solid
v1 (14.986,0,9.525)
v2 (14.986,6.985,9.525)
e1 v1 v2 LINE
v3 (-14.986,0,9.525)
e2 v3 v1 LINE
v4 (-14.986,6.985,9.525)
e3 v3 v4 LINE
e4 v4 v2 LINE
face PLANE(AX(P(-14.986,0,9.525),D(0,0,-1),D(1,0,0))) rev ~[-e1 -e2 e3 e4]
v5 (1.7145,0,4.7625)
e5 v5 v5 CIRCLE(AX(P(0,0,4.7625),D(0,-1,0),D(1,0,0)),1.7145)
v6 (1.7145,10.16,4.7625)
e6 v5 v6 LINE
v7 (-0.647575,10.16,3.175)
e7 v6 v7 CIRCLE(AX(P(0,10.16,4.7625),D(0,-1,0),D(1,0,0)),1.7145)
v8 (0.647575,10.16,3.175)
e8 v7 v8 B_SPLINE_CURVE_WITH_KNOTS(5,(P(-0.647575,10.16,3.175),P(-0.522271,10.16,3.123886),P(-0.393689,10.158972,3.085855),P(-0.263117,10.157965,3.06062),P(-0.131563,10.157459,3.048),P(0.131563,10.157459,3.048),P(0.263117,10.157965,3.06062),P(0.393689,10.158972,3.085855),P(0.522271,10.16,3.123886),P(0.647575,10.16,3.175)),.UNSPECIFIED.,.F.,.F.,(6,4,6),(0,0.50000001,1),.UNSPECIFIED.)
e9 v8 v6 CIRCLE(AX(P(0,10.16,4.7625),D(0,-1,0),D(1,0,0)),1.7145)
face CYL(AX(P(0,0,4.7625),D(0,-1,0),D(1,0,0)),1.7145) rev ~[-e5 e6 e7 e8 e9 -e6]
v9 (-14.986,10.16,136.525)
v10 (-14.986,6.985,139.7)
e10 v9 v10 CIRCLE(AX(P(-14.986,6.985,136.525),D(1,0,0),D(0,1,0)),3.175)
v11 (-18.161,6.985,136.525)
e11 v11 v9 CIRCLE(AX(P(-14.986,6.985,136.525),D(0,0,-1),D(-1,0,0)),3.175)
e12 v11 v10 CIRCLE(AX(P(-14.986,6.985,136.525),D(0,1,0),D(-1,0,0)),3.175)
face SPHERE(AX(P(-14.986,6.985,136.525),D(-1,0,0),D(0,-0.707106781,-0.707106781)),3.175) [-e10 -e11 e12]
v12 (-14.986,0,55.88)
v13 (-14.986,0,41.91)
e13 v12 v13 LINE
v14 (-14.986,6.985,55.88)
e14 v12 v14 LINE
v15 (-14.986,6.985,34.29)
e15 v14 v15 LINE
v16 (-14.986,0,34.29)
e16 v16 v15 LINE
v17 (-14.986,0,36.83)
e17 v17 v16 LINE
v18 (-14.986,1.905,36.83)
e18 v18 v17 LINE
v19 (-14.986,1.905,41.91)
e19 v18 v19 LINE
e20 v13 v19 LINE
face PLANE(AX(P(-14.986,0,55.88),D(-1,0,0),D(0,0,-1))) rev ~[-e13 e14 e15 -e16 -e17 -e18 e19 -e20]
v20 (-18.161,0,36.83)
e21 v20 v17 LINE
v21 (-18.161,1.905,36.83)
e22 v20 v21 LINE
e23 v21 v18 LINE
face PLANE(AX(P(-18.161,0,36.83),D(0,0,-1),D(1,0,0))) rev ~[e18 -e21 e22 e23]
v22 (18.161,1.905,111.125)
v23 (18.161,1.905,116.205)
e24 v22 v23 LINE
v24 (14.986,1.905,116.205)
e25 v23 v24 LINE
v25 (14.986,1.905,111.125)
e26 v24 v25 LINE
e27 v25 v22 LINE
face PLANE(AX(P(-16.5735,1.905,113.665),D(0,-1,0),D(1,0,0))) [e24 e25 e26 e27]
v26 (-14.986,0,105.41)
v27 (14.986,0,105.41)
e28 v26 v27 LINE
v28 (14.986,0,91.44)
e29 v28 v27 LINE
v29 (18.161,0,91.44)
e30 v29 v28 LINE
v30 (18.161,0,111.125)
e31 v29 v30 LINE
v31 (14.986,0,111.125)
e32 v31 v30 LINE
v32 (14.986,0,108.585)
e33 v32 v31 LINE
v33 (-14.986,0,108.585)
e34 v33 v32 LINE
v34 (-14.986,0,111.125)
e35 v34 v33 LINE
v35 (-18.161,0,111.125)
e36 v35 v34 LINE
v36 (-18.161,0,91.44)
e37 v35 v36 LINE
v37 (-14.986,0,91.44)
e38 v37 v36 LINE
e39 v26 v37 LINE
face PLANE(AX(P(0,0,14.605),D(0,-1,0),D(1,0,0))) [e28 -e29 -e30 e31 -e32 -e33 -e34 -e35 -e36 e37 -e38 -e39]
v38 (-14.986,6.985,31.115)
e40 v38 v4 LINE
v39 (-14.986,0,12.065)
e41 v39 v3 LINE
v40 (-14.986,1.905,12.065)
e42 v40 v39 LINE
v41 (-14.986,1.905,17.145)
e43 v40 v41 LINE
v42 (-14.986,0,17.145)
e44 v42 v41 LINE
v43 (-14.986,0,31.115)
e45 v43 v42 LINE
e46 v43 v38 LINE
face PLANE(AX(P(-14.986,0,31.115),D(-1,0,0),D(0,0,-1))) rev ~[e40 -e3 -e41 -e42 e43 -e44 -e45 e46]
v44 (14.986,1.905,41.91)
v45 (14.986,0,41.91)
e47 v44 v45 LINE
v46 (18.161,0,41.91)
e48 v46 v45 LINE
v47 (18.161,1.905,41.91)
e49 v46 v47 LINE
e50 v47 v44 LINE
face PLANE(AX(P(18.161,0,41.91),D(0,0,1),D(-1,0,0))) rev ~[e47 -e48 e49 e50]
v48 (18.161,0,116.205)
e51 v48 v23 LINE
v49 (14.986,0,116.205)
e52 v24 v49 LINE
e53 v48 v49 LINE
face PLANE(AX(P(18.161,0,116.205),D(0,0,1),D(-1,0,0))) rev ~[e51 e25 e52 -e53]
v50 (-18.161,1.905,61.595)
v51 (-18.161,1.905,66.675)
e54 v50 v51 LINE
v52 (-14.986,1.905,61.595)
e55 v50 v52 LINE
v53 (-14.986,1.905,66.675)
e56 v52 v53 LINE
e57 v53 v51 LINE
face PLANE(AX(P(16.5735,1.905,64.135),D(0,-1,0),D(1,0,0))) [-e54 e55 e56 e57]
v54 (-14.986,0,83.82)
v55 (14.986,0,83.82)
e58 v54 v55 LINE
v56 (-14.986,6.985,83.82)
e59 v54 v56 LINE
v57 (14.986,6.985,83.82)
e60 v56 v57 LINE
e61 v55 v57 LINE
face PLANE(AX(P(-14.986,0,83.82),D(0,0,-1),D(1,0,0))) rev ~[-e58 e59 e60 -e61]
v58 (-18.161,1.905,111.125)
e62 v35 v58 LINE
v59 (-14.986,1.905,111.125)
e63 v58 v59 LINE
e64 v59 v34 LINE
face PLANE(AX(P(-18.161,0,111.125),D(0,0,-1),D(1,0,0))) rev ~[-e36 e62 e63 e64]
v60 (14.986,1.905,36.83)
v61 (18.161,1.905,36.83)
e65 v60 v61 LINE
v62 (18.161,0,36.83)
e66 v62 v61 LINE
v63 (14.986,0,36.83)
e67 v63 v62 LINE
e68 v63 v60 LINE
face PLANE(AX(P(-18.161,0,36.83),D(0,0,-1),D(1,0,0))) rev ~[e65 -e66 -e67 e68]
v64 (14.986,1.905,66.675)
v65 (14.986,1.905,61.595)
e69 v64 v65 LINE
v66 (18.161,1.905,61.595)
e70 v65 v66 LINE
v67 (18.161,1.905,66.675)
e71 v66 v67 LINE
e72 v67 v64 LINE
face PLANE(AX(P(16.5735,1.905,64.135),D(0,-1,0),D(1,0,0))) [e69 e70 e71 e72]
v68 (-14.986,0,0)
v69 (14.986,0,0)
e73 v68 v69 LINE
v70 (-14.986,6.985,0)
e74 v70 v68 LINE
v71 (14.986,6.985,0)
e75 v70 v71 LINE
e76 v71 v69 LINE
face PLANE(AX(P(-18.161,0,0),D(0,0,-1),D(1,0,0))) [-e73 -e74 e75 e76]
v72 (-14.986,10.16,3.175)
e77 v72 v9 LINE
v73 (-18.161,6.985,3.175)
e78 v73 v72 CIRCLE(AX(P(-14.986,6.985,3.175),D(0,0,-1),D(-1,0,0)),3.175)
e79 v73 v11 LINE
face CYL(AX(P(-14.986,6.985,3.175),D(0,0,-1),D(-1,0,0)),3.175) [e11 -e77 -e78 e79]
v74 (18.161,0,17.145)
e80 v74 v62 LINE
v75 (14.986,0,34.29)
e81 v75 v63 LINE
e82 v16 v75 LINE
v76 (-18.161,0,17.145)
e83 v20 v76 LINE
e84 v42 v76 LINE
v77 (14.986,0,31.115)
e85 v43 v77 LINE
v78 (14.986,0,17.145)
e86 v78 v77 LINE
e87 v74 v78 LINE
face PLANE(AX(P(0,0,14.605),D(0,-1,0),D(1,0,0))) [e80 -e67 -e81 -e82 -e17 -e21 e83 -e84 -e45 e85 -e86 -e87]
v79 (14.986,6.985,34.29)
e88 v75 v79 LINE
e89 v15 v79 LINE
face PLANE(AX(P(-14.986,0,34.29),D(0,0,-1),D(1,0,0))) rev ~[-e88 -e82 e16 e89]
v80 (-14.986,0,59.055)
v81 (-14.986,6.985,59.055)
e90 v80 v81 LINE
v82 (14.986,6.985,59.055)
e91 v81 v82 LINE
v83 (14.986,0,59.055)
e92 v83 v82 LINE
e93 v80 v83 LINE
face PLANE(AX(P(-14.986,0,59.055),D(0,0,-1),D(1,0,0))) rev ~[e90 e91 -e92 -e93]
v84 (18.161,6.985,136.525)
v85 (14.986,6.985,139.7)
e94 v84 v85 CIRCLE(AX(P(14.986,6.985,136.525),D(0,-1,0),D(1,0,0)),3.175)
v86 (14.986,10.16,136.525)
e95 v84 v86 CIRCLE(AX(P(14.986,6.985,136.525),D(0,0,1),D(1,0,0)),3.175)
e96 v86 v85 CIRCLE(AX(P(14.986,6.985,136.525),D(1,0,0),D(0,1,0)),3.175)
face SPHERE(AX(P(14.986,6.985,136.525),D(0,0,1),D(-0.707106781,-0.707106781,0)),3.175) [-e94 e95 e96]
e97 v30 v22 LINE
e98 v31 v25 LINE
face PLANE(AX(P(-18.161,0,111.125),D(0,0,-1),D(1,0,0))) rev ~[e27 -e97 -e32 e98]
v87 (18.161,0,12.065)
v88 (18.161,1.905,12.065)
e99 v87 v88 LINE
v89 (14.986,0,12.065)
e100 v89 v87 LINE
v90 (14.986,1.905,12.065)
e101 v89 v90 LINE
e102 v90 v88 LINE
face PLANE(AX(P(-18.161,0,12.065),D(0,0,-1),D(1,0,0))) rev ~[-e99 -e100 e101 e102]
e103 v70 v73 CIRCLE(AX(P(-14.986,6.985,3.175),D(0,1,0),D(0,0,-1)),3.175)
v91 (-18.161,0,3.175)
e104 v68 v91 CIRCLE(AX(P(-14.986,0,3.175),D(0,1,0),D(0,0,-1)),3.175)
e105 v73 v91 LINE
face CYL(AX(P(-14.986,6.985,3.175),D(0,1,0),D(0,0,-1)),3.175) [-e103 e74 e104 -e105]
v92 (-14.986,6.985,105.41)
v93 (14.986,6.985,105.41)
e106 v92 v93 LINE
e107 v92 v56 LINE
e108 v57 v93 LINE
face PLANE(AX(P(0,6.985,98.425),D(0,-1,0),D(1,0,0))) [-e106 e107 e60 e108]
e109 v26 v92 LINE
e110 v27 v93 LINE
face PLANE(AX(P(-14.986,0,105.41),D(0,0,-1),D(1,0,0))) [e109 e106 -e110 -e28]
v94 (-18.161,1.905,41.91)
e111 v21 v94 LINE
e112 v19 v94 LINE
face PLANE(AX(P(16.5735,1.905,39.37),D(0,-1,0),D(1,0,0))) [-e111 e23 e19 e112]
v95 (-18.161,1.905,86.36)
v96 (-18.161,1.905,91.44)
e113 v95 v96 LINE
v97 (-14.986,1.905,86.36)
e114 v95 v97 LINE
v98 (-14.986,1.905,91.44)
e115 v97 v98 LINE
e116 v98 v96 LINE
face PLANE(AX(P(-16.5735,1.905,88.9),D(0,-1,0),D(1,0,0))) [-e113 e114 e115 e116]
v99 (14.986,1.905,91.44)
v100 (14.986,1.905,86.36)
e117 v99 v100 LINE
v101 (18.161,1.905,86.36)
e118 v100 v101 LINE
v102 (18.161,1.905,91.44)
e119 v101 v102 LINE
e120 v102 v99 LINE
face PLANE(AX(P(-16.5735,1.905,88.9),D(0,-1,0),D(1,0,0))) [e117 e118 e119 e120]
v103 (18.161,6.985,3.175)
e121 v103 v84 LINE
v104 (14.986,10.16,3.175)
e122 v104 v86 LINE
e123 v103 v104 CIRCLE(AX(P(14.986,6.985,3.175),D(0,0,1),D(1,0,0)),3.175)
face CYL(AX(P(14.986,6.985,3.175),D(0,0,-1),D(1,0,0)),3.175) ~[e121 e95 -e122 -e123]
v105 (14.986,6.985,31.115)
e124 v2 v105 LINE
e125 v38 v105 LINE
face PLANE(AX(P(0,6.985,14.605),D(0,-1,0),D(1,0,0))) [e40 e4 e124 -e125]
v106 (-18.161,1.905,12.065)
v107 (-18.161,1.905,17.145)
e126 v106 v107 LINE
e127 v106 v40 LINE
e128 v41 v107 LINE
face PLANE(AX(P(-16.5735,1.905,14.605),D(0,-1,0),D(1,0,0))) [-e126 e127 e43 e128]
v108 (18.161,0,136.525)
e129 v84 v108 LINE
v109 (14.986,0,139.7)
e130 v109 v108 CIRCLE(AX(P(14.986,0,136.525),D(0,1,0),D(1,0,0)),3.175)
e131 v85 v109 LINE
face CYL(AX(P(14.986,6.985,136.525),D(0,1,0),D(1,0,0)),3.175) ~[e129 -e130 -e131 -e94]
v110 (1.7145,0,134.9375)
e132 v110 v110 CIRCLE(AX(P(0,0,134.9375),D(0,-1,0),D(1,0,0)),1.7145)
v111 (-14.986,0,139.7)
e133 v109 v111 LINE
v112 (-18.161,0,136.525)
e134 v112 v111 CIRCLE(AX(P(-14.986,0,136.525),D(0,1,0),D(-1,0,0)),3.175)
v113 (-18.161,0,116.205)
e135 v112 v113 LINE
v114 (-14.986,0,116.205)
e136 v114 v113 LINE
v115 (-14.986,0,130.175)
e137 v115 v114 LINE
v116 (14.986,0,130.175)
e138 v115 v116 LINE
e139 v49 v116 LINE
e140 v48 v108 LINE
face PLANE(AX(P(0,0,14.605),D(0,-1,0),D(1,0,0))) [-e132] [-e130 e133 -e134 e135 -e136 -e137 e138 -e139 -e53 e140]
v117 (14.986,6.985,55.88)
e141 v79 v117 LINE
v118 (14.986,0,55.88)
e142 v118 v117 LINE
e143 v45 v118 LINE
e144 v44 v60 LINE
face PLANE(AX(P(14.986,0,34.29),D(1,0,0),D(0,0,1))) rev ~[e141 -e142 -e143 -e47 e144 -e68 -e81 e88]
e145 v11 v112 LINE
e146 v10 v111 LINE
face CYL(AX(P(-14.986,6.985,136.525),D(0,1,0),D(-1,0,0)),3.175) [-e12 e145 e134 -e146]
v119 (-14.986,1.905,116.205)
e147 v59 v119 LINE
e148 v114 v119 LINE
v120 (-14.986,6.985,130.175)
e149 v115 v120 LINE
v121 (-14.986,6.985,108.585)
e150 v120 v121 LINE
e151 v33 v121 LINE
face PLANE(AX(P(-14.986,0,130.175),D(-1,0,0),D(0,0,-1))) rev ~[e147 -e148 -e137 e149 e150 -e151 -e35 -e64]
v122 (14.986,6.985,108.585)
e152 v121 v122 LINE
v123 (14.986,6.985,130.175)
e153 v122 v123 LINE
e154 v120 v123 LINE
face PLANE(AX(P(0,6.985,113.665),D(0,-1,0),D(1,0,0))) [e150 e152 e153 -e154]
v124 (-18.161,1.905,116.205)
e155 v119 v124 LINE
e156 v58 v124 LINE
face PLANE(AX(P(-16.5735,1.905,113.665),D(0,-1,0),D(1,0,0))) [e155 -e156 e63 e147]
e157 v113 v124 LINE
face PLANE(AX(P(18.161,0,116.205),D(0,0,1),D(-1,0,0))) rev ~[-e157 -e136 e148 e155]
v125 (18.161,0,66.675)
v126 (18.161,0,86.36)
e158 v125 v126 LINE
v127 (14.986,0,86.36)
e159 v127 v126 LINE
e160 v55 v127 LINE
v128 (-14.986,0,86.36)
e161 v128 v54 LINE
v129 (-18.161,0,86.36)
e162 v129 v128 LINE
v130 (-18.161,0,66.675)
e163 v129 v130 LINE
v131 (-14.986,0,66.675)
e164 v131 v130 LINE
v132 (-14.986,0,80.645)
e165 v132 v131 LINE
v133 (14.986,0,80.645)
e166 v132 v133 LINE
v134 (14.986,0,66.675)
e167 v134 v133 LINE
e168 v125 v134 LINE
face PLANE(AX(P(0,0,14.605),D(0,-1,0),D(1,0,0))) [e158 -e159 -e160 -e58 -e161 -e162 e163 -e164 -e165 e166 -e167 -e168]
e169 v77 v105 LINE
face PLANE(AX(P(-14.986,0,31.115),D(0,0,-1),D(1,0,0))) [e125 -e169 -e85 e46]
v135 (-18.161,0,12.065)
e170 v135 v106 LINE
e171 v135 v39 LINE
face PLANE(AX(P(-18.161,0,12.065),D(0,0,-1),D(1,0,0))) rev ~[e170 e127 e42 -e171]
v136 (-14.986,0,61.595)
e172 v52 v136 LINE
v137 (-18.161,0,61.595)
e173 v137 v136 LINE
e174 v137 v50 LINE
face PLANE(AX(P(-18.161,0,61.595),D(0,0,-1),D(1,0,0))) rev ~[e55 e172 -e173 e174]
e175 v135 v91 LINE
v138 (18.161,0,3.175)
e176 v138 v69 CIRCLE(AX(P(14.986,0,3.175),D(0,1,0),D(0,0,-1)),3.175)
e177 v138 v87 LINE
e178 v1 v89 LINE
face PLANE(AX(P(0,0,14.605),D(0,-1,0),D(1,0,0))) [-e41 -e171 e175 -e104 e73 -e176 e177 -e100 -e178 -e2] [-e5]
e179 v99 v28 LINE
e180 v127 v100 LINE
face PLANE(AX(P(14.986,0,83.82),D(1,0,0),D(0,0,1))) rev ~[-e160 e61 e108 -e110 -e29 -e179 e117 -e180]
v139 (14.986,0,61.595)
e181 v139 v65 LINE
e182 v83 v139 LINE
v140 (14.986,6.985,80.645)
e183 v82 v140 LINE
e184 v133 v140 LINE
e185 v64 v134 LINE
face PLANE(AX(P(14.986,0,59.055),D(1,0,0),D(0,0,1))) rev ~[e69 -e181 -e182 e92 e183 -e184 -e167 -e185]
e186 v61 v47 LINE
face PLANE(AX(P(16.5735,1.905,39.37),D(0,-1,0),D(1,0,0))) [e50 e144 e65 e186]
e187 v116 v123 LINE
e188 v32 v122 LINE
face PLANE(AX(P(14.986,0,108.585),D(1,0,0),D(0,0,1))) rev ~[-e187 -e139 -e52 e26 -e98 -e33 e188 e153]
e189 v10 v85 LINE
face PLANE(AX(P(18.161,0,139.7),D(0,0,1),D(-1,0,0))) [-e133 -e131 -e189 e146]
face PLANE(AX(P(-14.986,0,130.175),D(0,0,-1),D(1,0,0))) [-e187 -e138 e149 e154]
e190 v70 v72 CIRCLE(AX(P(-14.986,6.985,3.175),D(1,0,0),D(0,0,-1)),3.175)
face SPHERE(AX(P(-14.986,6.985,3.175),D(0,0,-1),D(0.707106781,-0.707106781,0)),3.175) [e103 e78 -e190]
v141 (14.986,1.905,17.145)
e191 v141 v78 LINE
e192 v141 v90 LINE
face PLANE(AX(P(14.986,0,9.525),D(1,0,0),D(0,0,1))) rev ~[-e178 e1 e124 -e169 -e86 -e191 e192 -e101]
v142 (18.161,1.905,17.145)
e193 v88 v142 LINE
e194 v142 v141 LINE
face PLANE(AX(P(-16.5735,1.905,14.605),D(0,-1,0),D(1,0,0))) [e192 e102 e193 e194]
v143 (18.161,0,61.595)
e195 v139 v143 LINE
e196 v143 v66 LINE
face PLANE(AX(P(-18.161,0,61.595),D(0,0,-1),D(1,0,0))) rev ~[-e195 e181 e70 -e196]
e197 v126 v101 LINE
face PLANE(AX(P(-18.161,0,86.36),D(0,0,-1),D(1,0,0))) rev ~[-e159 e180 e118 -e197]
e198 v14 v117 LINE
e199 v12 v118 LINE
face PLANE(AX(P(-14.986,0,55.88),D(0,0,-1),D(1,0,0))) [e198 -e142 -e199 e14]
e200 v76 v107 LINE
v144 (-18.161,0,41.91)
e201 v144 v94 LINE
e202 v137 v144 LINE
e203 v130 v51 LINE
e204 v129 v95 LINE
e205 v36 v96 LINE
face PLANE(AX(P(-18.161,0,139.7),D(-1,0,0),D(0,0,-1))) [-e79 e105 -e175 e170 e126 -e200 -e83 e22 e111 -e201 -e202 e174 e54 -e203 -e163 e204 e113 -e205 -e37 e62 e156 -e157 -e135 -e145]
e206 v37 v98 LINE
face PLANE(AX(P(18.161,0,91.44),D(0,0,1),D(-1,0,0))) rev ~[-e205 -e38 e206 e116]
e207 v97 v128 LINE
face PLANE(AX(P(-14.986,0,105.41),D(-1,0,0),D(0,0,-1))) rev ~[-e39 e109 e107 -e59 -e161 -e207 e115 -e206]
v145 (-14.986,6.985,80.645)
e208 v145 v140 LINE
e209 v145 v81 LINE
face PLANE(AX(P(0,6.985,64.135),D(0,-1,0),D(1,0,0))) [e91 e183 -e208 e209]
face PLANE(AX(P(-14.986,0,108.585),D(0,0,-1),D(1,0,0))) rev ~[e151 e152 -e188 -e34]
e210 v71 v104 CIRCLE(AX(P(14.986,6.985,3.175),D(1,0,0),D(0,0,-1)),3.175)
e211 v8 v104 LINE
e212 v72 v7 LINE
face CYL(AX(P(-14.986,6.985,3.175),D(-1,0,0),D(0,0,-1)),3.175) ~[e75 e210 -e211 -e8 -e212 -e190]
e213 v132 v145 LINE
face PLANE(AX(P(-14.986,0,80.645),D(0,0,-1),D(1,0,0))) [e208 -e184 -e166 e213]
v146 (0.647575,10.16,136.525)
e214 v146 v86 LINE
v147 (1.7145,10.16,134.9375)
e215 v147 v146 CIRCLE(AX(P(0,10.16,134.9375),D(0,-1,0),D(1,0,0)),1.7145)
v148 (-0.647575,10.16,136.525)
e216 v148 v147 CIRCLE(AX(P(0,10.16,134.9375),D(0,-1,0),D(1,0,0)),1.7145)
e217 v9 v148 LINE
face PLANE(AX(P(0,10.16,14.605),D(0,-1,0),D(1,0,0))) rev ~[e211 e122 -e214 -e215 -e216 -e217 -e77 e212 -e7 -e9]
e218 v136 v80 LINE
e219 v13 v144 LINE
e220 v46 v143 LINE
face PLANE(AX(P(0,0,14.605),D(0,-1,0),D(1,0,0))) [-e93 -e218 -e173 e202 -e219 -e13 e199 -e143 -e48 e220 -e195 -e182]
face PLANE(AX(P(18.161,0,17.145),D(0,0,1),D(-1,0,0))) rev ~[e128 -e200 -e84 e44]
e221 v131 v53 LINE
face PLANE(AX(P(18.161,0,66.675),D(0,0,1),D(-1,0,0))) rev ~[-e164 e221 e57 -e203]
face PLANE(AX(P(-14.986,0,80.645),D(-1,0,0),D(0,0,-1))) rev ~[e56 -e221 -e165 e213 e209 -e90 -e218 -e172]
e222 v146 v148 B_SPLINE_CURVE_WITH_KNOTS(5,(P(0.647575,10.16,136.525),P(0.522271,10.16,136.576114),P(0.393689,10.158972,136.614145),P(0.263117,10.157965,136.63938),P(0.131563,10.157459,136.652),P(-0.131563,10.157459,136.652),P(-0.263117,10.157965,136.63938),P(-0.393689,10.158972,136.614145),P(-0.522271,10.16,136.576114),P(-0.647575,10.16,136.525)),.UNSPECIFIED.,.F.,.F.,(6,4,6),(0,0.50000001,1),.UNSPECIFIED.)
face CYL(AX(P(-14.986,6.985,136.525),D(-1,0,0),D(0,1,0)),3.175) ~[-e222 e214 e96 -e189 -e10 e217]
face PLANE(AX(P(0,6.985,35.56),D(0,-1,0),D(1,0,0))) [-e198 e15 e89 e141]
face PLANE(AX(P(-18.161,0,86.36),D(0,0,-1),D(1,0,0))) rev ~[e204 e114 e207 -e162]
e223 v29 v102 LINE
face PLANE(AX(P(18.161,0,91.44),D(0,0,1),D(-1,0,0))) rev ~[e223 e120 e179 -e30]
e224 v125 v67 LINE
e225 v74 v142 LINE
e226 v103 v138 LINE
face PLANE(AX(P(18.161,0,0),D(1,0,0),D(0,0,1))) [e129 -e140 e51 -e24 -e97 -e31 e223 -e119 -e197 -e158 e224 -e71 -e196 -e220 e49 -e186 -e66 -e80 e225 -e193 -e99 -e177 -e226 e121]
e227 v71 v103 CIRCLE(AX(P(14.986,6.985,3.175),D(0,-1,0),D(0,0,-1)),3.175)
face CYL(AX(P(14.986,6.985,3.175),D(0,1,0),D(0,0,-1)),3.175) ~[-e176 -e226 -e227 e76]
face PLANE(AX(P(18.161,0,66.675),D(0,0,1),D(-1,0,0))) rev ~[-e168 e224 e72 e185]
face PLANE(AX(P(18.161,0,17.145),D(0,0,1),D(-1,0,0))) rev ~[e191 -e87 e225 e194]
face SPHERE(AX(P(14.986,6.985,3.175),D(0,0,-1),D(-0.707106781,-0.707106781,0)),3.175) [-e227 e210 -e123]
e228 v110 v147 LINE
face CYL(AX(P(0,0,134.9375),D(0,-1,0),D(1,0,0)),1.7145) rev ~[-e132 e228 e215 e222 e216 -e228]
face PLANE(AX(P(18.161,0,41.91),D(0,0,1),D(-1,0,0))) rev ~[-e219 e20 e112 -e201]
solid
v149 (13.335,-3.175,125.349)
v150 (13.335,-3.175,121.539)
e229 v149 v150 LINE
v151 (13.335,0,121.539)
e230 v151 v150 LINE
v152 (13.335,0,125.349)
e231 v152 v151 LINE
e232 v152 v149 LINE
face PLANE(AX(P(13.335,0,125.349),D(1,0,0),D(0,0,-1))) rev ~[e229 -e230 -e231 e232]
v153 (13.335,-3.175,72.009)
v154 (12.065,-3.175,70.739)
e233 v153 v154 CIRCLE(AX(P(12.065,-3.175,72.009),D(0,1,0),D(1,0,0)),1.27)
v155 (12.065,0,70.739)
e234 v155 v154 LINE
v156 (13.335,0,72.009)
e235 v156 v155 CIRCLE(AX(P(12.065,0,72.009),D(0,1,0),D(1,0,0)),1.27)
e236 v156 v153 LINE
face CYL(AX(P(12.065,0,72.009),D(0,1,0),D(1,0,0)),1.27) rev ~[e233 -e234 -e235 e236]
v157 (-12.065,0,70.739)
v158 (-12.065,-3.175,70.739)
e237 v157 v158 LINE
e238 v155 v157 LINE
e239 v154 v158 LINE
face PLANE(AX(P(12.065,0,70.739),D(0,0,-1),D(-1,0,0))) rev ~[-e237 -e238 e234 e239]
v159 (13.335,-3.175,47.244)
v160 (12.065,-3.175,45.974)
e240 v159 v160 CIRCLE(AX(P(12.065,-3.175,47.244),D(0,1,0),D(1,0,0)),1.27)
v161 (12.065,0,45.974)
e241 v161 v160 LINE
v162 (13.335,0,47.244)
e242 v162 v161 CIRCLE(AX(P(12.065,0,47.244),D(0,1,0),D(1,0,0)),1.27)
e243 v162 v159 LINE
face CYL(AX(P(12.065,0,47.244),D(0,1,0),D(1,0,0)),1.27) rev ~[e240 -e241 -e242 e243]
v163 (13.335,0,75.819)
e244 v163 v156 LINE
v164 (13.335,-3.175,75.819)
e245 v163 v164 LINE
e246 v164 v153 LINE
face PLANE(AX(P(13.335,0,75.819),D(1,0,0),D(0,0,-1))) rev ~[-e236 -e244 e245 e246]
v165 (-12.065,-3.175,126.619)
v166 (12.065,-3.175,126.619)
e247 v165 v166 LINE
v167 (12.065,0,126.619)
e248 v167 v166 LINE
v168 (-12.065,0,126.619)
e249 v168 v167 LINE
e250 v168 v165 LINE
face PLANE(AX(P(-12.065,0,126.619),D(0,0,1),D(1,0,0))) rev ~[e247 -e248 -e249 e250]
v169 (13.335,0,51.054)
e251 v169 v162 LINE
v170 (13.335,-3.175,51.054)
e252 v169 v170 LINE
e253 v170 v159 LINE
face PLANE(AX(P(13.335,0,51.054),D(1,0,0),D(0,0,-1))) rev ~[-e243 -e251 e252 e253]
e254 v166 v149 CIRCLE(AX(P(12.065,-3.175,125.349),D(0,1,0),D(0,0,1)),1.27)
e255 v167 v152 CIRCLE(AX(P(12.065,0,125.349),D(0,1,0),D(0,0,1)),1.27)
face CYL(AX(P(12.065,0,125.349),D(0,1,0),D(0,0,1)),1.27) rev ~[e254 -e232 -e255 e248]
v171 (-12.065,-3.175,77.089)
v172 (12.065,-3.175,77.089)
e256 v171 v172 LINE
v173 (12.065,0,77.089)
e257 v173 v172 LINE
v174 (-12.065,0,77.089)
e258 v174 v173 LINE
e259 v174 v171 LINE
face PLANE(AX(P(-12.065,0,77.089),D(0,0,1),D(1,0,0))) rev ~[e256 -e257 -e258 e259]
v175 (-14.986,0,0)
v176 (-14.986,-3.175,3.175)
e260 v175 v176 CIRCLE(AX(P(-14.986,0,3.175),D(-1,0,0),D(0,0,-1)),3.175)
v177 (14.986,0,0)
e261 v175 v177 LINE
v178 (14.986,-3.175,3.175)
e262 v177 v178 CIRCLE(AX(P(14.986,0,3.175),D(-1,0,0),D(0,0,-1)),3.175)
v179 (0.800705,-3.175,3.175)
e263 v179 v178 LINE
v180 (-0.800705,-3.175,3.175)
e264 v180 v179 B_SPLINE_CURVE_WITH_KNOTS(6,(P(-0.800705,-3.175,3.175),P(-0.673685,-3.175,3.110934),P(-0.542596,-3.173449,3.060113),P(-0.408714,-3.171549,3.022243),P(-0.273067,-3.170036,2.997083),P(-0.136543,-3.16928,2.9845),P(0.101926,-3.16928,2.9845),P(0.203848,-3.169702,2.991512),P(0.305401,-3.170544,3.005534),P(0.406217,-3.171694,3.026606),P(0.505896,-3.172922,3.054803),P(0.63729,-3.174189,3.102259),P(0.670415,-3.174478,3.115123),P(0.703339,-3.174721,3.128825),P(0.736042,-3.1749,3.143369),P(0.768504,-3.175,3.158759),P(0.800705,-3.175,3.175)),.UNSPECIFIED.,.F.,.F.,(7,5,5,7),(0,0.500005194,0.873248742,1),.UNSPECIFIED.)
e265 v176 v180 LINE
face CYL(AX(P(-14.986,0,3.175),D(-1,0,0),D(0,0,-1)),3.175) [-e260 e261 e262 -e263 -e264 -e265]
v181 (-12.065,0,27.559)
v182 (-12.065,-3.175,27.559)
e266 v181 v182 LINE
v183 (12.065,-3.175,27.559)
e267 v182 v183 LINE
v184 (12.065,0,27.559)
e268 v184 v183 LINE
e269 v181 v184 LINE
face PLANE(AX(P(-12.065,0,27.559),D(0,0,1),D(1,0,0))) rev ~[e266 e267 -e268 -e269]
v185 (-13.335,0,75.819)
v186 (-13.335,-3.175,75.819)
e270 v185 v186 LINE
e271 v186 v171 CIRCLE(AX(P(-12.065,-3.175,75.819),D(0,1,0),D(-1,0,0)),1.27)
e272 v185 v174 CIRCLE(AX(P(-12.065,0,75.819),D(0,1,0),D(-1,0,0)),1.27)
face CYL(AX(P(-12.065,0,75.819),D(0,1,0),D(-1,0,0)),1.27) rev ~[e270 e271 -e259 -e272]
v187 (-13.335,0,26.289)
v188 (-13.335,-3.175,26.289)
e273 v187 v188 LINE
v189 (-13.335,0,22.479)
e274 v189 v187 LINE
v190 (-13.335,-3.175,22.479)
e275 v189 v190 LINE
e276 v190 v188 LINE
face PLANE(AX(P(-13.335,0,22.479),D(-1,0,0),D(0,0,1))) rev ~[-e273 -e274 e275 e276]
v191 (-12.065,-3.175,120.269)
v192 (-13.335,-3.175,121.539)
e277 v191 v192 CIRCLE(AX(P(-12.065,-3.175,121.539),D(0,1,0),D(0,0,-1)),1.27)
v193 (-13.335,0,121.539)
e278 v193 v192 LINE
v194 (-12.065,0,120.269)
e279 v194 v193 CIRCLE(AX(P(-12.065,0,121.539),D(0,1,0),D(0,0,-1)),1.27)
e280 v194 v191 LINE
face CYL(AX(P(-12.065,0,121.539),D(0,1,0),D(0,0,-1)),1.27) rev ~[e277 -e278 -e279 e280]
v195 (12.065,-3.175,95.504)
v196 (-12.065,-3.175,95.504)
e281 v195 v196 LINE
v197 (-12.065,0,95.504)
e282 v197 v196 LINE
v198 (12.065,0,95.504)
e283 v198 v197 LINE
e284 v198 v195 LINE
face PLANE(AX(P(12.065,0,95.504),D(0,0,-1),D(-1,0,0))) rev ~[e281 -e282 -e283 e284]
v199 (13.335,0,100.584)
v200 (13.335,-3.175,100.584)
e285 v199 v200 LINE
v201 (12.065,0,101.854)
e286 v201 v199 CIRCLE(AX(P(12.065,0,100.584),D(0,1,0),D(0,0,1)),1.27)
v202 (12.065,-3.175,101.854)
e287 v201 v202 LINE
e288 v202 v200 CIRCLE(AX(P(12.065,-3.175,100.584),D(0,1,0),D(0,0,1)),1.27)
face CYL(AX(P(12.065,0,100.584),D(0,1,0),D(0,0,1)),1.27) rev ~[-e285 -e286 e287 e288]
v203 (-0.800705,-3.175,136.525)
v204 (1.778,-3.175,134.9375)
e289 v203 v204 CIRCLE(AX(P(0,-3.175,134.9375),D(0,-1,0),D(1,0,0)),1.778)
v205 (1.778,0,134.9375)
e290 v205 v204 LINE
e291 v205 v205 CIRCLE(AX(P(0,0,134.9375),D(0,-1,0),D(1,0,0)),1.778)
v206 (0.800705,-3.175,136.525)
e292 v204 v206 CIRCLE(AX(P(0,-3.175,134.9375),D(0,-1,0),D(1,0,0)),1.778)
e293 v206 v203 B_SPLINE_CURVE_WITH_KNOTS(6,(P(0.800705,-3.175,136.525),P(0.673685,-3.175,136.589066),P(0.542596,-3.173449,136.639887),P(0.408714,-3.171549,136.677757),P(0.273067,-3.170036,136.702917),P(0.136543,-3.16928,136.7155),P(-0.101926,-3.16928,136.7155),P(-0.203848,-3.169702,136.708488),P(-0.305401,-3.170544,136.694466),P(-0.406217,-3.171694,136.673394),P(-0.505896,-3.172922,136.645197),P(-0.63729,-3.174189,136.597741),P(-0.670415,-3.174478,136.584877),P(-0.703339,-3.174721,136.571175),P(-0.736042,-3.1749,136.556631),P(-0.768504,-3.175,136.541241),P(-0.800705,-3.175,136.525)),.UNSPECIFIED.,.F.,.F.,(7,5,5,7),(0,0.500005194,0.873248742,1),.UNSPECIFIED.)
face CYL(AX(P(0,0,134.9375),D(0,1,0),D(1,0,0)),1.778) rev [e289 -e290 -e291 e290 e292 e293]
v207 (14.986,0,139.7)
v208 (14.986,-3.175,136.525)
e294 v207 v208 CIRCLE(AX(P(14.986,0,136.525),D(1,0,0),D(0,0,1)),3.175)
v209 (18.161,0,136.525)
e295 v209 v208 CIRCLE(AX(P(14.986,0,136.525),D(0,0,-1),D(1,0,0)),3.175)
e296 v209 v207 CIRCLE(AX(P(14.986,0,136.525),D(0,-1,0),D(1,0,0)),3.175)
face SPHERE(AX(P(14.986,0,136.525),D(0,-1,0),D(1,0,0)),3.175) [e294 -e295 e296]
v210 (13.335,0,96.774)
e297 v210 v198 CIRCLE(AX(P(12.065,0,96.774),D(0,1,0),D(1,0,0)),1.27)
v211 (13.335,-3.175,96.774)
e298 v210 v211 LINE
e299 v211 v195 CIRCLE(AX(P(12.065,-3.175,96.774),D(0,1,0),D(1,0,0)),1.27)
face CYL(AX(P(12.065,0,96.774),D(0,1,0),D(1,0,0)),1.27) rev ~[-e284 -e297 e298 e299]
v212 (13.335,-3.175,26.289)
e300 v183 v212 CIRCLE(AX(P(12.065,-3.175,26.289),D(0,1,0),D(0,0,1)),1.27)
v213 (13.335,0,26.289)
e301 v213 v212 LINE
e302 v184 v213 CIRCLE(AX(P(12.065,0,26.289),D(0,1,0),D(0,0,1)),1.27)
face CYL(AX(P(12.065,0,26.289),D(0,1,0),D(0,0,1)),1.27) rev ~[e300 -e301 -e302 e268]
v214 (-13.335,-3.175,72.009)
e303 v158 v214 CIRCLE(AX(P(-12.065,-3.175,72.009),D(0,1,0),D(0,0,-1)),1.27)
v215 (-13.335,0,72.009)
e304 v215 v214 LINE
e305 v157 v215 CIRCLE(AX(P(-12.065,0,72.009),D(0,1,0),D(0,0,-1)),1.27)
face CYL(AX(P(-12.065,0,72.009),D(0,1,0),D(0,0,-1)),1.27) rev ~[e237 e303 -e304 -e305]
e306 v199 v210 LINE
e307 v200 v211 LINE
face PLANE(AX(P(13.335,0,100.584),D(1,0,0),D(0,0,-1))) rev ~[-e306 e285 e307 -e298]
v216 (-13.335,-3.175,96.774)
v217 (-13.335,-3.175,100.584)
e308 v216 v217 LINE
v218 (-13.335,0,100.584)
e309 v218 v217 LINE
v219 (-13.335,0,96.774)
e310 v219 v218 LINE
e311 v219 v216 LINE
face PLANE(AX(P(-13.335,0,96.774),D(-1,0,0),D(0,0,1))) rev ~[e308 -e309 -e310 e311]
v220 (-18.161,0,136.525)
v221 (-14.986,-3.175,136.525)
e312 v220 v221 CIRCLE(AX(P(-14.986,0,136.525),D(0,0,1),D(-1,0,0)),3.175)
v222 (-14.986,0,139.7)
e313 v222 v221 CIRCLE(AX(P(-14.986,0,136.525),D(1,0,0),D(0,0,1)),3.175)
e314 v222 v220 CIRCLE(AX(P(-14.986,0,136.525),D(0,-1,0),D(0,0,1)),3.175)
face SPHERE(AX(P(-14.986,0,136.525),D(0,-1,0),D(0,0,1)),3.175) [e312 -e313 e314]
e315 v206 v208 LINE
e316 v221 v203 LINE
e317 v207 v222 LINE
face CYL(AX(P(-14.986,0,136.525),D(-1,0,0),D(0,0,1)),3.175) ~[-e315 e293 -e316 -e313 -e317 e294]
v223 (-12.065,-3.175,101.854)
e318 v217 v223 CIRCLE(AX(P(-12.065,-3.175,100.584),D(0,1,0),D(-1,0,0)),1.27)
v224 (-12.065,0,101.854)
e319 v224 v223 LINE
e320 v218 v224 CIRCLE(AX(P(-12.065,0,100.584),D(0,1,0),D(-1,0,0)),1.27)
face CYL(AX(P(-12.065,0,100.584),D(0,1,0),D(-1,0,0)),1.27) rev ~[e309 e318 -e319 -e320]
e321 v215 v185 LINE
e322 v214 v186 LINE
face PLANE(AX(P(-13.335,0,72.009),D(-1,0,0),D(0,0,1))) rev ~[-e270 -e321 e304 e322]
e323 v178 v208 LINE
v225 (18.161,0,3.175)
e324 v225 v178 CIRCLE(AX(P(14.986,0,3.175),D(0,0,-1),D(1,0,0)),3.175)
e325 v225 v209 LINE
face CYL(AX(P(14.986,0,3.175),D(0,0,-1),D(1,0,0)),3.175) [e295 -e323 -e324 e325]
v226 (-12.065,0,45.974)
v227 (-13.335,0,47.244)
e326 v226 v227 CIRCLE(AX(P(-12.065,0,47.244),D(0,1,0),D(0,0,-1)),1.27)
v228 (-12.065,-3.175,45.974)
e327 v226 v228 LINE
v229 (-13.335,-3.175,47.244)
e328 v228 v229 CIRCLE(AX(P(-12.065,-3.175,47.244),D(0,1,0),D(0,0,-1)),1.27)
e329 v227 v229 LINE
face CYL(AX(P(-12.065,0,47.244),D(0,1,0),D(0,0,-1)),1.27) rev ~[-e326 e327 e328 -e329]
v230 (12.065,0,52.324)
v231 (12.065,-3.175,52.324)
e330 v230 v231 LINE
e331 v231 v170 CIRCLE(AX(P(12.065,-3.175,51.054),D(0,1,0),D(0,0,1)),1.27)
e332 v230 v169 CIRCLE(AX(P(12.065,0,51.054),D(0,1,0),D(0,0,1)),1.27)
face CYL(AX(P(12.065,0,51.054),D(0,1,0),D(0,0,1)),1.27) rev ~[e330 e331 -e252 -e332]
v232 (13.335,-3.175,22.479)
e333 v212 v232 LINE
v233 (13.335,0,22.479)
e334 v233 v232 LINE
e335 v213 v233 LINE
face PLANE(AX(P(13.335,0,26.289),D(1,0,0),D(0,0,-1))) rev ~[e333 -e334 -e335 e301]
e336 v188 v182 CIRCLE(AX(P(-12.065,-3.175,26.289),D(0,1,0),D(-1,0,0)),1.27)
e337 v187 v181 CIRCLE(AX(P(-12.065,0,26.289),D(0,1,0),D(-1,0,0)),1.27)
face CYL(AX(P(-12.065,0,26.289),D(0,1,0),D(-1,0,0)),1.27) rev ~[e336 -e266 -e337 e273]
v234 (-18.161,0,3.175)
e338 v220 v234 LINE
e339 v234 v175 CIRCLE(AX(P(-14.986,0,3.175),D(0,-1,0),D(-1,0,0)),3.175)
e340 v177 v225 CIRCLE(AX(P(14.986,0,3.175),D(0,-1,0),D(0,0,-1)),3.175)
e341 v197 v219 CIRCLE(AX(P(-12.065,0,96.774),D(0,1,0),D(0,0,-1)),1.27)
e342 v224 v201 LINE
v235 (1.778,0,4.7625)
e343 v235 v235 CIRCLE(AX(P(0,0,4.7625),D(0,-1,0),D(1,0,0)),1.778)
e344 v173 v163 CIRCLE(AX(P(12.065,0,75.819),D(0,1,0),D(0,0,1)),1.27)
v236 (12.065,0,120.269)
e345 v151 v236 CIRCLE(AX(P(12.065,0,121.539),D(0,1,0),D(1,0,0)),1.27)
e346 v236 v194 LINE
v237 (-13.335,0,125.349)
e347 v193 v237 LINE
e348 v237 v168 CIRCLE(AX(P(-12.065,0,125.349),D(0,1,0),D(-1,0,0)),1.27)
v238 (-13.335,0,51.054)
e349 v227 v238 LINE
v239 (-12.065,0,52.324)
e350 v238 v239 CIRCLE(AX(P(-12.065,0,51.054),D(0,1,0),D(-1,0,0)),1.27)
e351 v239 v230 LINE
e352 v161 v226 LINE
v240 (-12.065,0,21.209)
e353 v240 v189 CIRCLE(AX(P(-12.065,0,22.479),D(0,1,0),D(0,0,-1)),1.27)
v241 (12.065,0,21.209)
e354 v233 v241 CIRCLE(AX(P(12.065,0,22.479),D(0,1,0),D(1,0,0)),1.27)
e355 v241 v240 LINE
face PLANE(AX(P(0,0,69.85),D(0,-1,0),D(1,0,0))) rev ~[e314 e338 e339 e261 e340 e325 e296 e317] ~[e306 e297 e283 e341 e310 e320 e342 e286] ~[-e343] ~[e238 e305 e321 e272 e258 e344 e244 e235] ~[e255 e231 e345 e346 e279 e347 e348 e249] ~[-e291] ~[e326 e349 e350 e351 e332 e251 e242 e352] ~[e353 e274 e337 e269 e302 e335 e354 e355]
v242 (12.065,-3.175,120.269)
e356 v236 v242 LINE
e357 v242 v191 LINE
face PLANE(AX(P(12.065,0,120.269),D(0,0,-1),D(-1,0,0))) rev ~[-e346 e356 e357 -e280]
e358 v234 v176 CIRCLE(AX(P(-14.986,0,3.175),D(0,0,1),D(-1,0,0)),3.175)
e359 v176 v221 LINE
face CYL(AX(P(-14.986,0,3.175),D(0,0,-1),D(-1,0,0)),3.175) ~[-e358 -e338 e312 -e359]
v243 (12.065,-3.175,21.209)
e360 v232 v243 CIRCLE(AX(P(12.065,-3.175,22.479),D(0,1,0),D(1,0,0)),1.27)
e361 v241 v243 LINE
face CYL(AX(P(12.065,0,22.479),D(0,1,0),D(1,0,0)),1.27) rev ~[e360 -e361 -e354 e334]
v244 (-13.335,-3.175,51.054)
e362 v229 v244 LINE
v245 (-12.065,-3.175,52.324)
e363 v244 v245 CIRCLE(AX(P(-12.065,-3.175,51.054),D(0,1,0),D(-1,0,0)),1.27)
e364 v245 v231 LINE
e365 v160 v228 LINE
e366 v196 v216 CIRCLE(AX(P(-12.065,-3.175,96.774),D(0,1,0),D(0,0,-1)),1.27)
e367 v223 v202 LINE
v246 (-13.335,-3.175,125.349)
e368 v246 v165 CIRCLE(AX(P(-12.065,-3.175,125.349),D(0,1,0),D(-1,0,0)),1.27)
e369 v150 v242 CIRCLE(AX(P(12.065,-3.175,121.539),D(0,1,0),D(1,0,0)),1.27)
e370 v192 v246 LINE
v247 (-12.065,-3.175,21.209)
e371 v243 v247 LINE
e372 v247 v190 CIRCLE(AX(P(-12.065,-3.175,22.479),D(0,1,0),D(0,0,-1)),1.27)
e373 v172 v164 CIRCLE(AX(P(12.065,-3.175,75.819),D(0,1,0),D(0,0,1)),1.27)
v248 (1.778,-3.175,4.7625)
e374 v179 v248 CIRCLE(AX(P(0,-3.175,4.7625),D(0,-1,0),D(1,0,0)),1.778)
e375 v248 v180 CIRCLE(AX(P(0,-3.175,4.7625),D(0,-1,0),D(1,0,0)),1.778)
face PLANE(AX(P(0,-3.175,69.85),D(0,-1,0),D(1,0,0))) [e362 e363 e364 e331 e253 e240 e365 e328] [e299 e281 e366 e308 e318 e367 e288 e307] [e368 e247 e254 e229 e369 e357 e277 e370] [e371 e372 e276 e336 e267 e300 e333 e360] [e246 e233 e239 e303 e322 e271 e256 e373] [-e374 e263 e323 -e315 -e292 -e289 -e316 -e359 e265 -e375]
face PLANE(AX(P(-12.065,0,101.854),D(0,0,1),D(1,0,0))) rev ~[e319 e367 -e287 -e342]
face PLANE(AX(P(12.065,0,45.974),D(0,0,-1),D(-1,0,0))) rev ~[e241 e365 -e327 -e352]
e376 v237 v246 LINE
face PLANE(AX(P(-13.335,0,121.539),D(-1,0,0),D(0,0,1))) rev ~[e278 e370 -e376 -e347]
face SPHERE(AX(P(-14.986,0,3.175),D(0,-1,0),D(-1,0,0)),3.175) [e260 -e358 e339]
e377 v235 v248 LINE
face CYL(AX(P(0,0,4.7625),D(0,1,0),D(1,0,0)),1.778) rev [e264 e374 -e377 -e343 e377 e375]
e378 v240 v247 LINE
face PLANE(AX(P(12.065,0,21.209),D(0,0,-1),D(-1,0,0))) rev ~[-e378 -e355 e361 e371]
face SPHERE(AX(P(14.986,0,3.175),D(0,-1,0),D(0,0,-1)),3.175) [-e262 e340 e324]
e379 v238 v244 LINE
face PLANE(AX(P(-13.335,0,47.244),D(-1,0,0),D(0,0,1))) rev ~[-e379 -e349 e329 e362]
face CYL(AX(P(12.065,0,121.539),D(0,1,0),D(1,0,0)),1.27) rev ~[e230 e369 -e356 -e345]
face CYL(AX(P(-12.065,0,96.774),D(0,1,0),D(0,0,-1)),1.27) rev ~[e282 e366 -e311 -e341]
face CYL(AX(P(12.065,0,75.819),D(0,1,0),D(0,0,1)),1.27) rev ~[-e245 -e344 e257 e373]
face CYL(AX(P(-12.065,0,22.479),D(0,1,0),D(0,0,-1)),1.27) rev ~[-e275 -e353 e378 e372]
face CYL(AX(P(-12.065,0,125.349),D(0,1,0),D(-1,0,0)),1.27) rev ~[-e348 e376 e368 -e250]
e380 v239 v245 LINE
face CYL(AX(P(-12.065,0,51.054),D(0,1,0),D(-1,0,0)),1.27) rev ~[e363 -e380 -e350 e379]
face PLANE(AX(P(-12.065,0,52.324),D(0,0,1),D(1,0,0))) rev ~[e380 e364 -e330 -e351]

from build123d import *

# Parameters (mm, degrees)
F0_W         = 29.972
F0_H         = 5.08
F0_H_2       = 2.54
F0_R         = 1.7145
F0_H_3       = 13.97
F0_W_2       = 3.175
F1_DEPTH     = 10.16
F2_DEPTH     = 6.985
F3_DEPTH     = 1.905
F4_T1_DEPTH  = 133.35
F4_T3_DEPTH  = 14.9225
F4_T5_DEPTH  = 29.972
F4_S9_W      = 3.175
F4_S9_H      = 3.175
F4_T10_DEPTH = 3.175
F4_S15_W     = 3.175
F4_S15_H     = 3.175
F4_T16_DEPTH = 3.175
F4_S21_W     = 3.175
F4_S21_H     = 3.175
F4_T22_DEPTH = 3.175
F4_S27_W     = 3.175
F4_S27_H     = 3.175
F4_T28_DEPTH = 3.175
F5_R         = 1.778
F6_DEPTH     = 3.175
F7_T1_DEPTH  = 133.35
F7_T3_DEPTH  = 29.972
F7_T6_ANGLE  = 90
F7_T8_ANGLE  = 90
F7_T10_ANGLE = 90
F7_T12_ANGLE = 90


# Not quite as in the source:
# - a fillet or chamfer that OpenCascade refuses, or shapes differently, is made with other operations: its cross-section is extruded or revolved along the edge and cut away or added


with BuildPart() as f1:
    # F0 (on Front) → F1 (new body)
    with BuildSketch(Plane.XZ):
        with Locations((0, 14.605)):
            Rectangle(F0_W, F0_H)
        Polygon((-18.161, 86.36), (-18.161, 66.675), (-14.986, 66.675), (-14.986, 80.645), (14.986, 80.645), (14.986, 66.675), (18.161, 66.675), (18.161, 86.36), (14.986, 86.36), (14.986, 83.82), (-14.986, 83.82), (-14.986, 86.36), align=None)
        with Locations((0, 60.325)):
            Rectangle(F0_W, F0_H_2)
        Polygon((-18.161, 12.065), (-18.161, 0), (18.161, 0), (18.161, 12.065), (14.986, 12.065), (14.986, 9.525), (-14.986, 9.525), (-14.986, 12.065), align=None)
        with Locations((0, 4.7625)):
            Circle(F0_R, mode=Mode.SUBTRACT)
        with Locations((0, 85.09)):
            Rectangle(F0_W, F0_H_2)
        with Locations((0, 98.425)):
            Rectangle(F0_W, F0_H_3)
        Polygon((-18.161, 139.7), (-18.161, 116.205), (-14.986, 116.205), (-14.986, 130.175), (14.986, 130.175), (14.986, 116.205), (18.161, 116.205), (18.161, 139.7), align=None)
        with Locations((0, 134.9375)):
            Circle(F0_R, mode=Mode.SUBTRACT)
        with Locations((0, 48.895)):
            Rectangle(F0_W, F0_H_3)
        with Locations((0, 10.795)):
            Rectangle(F0_W, F0_H_2)
        with Locations((-16.5735, 39.37)):
            Rectangle(F0_W_2, F0_H)
        with Locations((0, 73.66)):
            Rectangle(F0_W, F0_H_3)
        with Locations((-16.5735, 14.605)):
            Rectangle(F0_W_2, F0_H)
        with Locations((0, 123.19)):
            Rectangle(F0_W, F0_H_3)
        with Locations((0, 109.855)):
            Rectangle(F0_W, F0_H_2)
        with Locations((0, 24.13)):
            Rectangle(F0_W, F0_H_3)
        with Locations((0, 35.56)):
            Rectangle(F0_W, F0_H_2)
        with Locations((-16.5735, 113.665)):
            Rectangle(F0_W_2, F0_H)
        with Locations((-16.5735, 64.135)):
            Rectangle(F0_W_2, F0_H)
        with Locations((0, 113.665)):
            Rectangle(F0_W, F0_H)
        Polygon((-18.161, 36.83), (-18.161, 17.145), (-14.986, 17.145), (-14.986, 31.115), (14.986, 31.115), (14.986, 17.145), (18.161, 17.145), (18.161, 36.83), (14.986, 36.83), (14.986, 34.29), (-14.986, 34.29), (-14.986, 36.83), align=None)
        with Locations((0, 39.37)):
            Rectangle(F0_W, F0_H)
        Polygon((-18.161, 111.125), (-18.161, 91.44), (-14.986, 91.44), (-14.986, 105.41), (14.986, 105.41), (14.986, 91.44), (18.161, 91.44), (18.161, 111.125), (14.986, 111.125), (14.986, 108.585), (-14.986, 108.585), (-14.986, 111.125), align=None)
        Polygon((-18.161, 61.595), (-18.161, 41.91), (-14.986, 41.91), (-14.986, 55.88), (14.986, 55.88), (14.986, 41.91), (18.161, 41.91), (18.161, 61.595), (14.986, 61.595), (14.986, 59.055), (-14.986, 59.055), (-14.986, 61.595), align=None)
        with Locations((0, 64.135)):
            Rectangle(F0_W, F0_H)
        with Locations((-16.5735, 88.9)):
            Rectangle(F0_W_2, F0_H)
        with Locations((0, 88.9)):
            Rectangle(F0_W, F0_H)
        with Locations((16.5735, 39.37)):
            Rectangle(F0_W_2, F0_H)
        with Locations((16.5735, 14.605)):
            Rectangle(F0_W_2, F0_H)
        with Locations((16.5735, 88.9)):
            Rectangle(F0_W_2, F0_H)
        with Locations((16.5735, 113.665)):
            Rectangle(F0_W_2, F0_H)
        with Locations((16.5735, 64.135)):
            Rectangle(F0_W_2, F0_H)
    extrude(amount=-F1_DEPTH)

    # F0 (on Front) → F2 (cut)
    with BuildSketch(Plane.XZ):
        with Locations((0, 98.425)):
            Rectangle(F0_W, F0_H_3)
        with Locations((0, 35.56)):
            Rectangle(F0_W, F0_H_2)
        with Locations((0, 48.895)):
            Rectangle(F0_W, F0_H_3)
        with Locations((0, 64.135)):
            Rectangle(F0_W, F0_H)
        with Locations((0, 14.605)):
            Rectangle(F0_W, F0_H)
        with Locations((0, 10.795)):
            Rectangle(F0_W, F0_H_2)
        with Locations((0, 113.665)):
            Rectangle(F0_W, F0_H)
        with Locations((0, 88.9)):
            Rectangle(F0_W, F0_H)
        with Locations((0, 123.19)):
            Rectangle(F0_W, F0_H_3)
        with Locations((0, 60.325)):
            Rectangle(F0_W, F0_H_2)
        with Locations((0, 24.13)):
            Rectangle(F0_W, F0_H_3)
        with Locations((0, 73.66)):
            Rectangle(F0_W, F0_H_3)
        with Locations((0, 39.37)):
            Rectangle(F0_W, F0_H)
        with Locations((0, 85.09)):
            Rectangle(F0_W, F0_H_2)
        with Locations((0, 109.855)):
            Rectangle(F0_W, F0_H_2)
    extrude(amount=-F2_DEPTH, mode=Mode.SUBTRACT)

    # F0 (on Front) → F3 (cut)
    with BuildSketch(Plane.XZ):
        with Locations((-16.5735, 14.605)):
            Rectangle(F0_W_2, F0_H)
        with Locations((0, 14.605)):
            Rectangle(F0_W, F0_H)
        with Locations((16.5735, 14.605)):
            Rectangle(F0_W_2, F0_H)
        with Locations((16.5735, 39.37)):
            Rectangle(F0_W_2, F0_H)
        with Locations((0, 39.37)):
            Rectangle(F0_W, F0_H)
        with Locations((-16.5735, 39.37)):
            Rectangle(F0_W_2, F0_H)
        with Locations((-16.5735, 88.9)):
            Rectangle(F0_W_2, F0_H)
        with Locations((0, 88.9)):
            Rectangle(F0_W, F0_H)
        with Locations((16.5735, 88.9)):
            Rectangle(F0_W_2, F0_H)
        with Locations((16.5735, 64.135)):
            Rectangle(F0_W_2, F0_H)
        with Locations((0, 64.135)):
            Rectangle(F0_W, F0_H)
        with Locations((-16.5735, 64.135)):
            Rectangle(F0_W_2, F0_H)
        with Locations((-16.5735, 113.665)):
            Rectangle(F0_W_2, F0_H)
        with Locations((0, 113.665)):
            Rectangle(F0_W, F0_H)
        with Locations((16.5735, 113.665)):
            Rectangle(F0_W_2, F0_H)
    extrude(amount=-F3_DEPTH, mode=Mode.SUBTRACT)

    # F4: fillet of radius 3.175 on 8 edges, made by hand

    # F4_s2 → F4_t1 (cut)
    with BuildSketch(Plane.XY.offset(3.175)):
        with BuildLine():
            ThreePointArc((18.161, 6.985), (17.2310640303, 9.2300640303), (14.986, 10.16))
            Line((14.986, 10.16), (18.161, 10.16))
            Line((18.161, 10.16), (18.161, 6.985))
        make_face()
        with BuildLine():
            ThreePointArc((-18.161, 6.985), (-17.2310640303, 9.2300640303), (-14.986, 10.16))
            Line((-14.986, 10.16), (-18.161, 10.16))
            Line((-18.161, 10.16), (-18.161, 6.985))
        make_face()
    extrude(amount=F4_T1_DEPTH, mode=Mode.SUBTRACT)

    # F4_s4 → F4_t3 (cut)
    with BuildSketch(Plane.XZ.offset(-6.985)):
        with BuildLine():
            ThreePointArc((18.161, 136.525), (17.2310640303, 138.7700640303), (14.986, 139.7))
            Line((14.986, 139.7), (18.161, 139.7))
            Line((18.161, 139.7), (18.161, 136.525))
        make_face()
        with BuildLine():
            ThreePointArc((-18.161, 136.525), (-17.2310640303, 138.7700640303), (-14.986, 139.7))
            Line((-14.986, 139.7), (-18.161, 139.7))
            Line((-18.161, 139.7), (-18.161, 136.525))
        make_face()
        with BuildLine():
            ThreePointArc((-14.986, 0), (-17.2310640303, 0.9299359697), (-18.161, 3.175))
            Line((-18.161, 3.175), (-18.161, 0))
            Line((-18.161, 0), (-14.986, 0))
        make_face()
        with BuildLine():
            ThreePointArc((14.986, 0), (17.2310640303, 0.9299359697), (18.161, 3.175))
            Line((18.161, 3.175), (18.161, 0))
            Line((18.161, 0), (14.986, 0))
        make_face()
    extrude(amount=F4_T3_DEPTH, mode=Mode.SUBTRACT)

    # F4_s6 → F4_t5 (cut)
    with BuildSketch(Plane.YZ.offset(-14.986)):
        with BuildLine():
            ThreePointArc((6.985, 0), (9.2300640303, 0.9299359697), (10.16, 3.175))
            Line((10.16, 3.175), (10.16, 0))
            Line((10.16, 0), (6.985, 0))
        make_face()
        with BuildLine():
            ThreePointArc((10.16, 136.525), (9.2300640303, 138.7700640303), (6.985, 139.7))
            Line((6.985, 139.7), (10.16, 139.7))
            Line((10.16, 139.7), (10.16, 136.525))
        make_face()
    extrude(amount=F4_T5_DEPTH, mode=Mode.SUBTRACT)


with BuildPart() as f4_tool8:
    # F4_s9 → F4_t10 (new body)
    with BuildSketch(Plane.XY.offset(3.175)):
        with Locations((16.5735, 8.5725)):
            Rectangle(F4_S9_W, F4_S9_H)
    extrude(amount=-F4_T10_DEPTH)

    # F4_s11 → F4_t12 (revolve, cut)
    with BuildSketch(Plane(origin=(14.986, 6.985, 3.175), x_dir=(-0.7071067812, -0.7071067812, 0), z_dir=(0.7071067812, -0.7071067812, 0))):
        with BuildLine():
            ThreePointArc((0, -3.175), (3.175, 0), (0, 3.175))
            Line((0, 3.175), (0, -3.175))
        make_face()
    revolve(axis=Axis((14.986, 6.985, 3.175), (0, 0, -1)), mode=Mode.SUBTRACT)


with BuildPart() as f1_1:
    add(f1.part)

    # F4_t7: cut F4_tool8
    add(f4_tool8.part, mode=Mode.SUBTRACT)


with BuildPart() as f4_tool14:
    # F4_s15 → F4_t16 (new body)
    with BuildSketch(Plane.XY.offset(136.525)):
        with Locations((16.5735, 8.5725)):
            Rectangle(F4_S15_W, F4_S15_H)
    extrude(amount=F4_T16_DEPTH)

    # F4_s17 → F4_t18 (revolve, cut)
    with BuildSketch(Plane(origin=(14.986, 6.985, 136.525), x_dir=(-0.7071067812, -0.7071067812, 0), z_dir=(-0.7071067812, 0.7071067812, 0))):
        with BuildLine():
            ThreePointArc((0, -3.175), (3.175, 0), (0, 3.175))
            Line((0, 3.175), (0, -3.175))
        make_face()
    revolve(axis=Axis((14.986, 6.985, 136.525), (0, 0, 1)), mode=Mode.SUBTRACT)


with BuildPart() as f1_2:
    add(f1_1.part)

    # F4_t13: cut F4_tool14
    add(f4_tool14.part, mode=Mode.SUBTRACT)


with BuildPart() as f4_tool20:
    # F4_s21 → F4_t22 (new body)
    with BuildSketch(Plane.YZ.offset(-14.986)):
        with Locations((8.5725, 138.1125)):
            Rectangle(F4_S21_W, F4_S21_H)
    extrude(amount=-F4_T22_DEPTH)

    # F4_s23 → F4_t24 (revolve, cut)
    with BuildSketch(Plane(origin=(-14.986, 6.985, 136.525), x_dir=(0, -0.7071067812, -0.7071067812), z_dir=(0, 0.7071067812, -0.7071067812))):
        with BuildLine():
            ThreePointArc((0, -3.175), (3.175, 0), (0, 3.175))
            Line((0, 3.175), (0, -3.175))
        make_face()
    revolve(axis=Axis((-14.986, 6.985, 136.525), (-1, 0, 0)), mode=Mode.SUBTRACT)


with BuildPart() as f1_3:
    add(f1_2.part)

    # F4_t19: cut F4_tool20
    add(f4_tool20.part, mode=Mode.SUBTRACT)


with BuildPart() as f4_tool26:
    # F4_s27 → F4_t28 (new body)
    with BuildSketch(Plane.XY.offset(3.175)):
        with Locations((-16.5735, 8.5725)):
            Rectangle(F4_S27_W, F4_S27_H)
    extrude(amount=-F4_T28_DEPTH)

    # F4_s29 → F4_t30 (revolve, cut)
    with BuildSketch(Plane(origin=(-14.986, 6.985, 3.175), x_dir=(0.7071067812, -0.7071067812, 0), z_dir=(0.7071067812, 0.7071067812, 0))):
        with BuildLine():
            ThreePointArc((0, -3.175), (3.175, 0), (0, 3.175))
            Line((0, 3.175), (0, -3.175))
        make_face()
    revolve(axis=Axis((-14.986, 6.985, 3.175), (0, 0, -1)), mode=Mode.SUBTRACT)


with BuildPart() as f1_4:
    add(f1_3.part)

    # F4_t25: cut F4_tool26
    add(f4_tool26.part, mode=Mode.SUBTRACT)


with BuildPart() as f6:
    # F5 (on Front) → F6 (new body)
    with BuildSketch(Plane.XZ):
        with BuildLine():
            ThreePointArc((-18.161, 3.175), (-17.2310640303, 0.9299359697), (-14.986, 0))
            Line((-14.986, 0), (14.986, 0))
            ThreePointArc((14.986, 0), (17.2310640303, 0.9299359697), (18.161, 3.175))
            Line((18.161, 3.175), (18.161, 136.525))
            ThreePointArc((18.161, 136.525), (17.2310640303, 138.7700640303), (14.986, 139.7))
            Line((14.986, 139.7), (-14.986, 139.7))
            ThreePointArc((-14.986, 139.7), (-17.2310640303, 138.7700640303), (-18.161, 136.525))
            Line((-18.161, 136.525), (-18.161, 3.175))
        make_face()
        with Locations((0, 4.7625)):
            Circle(F5_R, mode=Mode.SUBTRACT)
        with BuildLine():
            Line((12.065, 21.209), (-12.065, 21.209))
            ThreePointArc((-12.065, 21.209), (-12.9630256121, 21.5809743879), (-13.335, 22.479))
            Line((-13.335, 22.479), (-13.335, 26.289))
            ThreePointArc((-13.335, 26.289), (-12.9630256121, 27.1870256121), (-12.065, 27.559))
            Line((-12.065, 27.559), (12.065, 27.559))
            ThreePointArc((12.065, 27.559), (12.9630256121, 27.1870256121), (13.335, 26.289))
            Line((13.335, 26.289), (13.335, 22.479))
            ThreePointArc((13.335, 22.479), (12.9630256121, 21.5809743879), (12.065, 21.209))
        make_face(mode=Mode.SUBTRACT)
        with BuildLine():
            Line((12.065, 45.974), (-12.065, 45.974))
            ThreePointArc((-12.065, 45.974), (-12.9630256121, 46.3459743879), (-13.335, 47.244))
            Line((-13.335, 47.244), (-13.335, 51.054))
            ThreePointArc((-13.335, 51.054), (-12.9630256121, 51.9520256121), (-12.065, 52.324))
            Line((-12.065, 52.324), (12.065, 52.324))
            ThreePointArc((12.065, 52.324), (12.9630256121, 51.9520256121), (13.335, 51.054))
            Line((13.335, 51.054), (13.335, 47.244))
            ThreePointArc((13.335, 47.244), (12.9630256121, 46.3459743879), (12.065, 45.974))
        make_face(mode=Mode.SUBTRACT)
        with BuildLine():
            Line((12.065, 70.739), (-12.065, 70.739))
            ThreePointArc((-12.065, 70.739), (-12.9630256121, 71.1109743879), (-13.335, 72.009))
            Line((-13.335, 72.009), (-13.335, 75.819))
            ThreePointArc((-13.335, 75.819), (-12.9630256121, 76.7170256121), (-12.065, 77.089))
            Line((-12.065, 77.089), (12.065, 77.089))
            ThreePointArc((12.065, 77.089), (12.9630256121, 76.7170256121), (13.335, 75.819))
            Line((13.335, 75.819), (13.335, 72.009))
            ThreePointArc((13.335, 72.009), (12.9630256121, 71.1109743879), (12.065, 70.739))
        make_face(mode=Mode.SUBTRACT)
        with BuildLine():
            Line((12.065, 95.504), (-12.065, 95.504))
            ThreePointArc((-12.065, 95.504), (-12.9630256121, 95.8759743879), (-13.335, 96.774))
            Line((-13.335, 96.774), (-13.335, 100.584))
            ThreePointArc((-13.335, 100.584), (-12.9630256121, 101.4820256121), (-12.065, 101.854))
            Line((-12.065, 101.854), (12.065, 101.854))
            ThreePointArc((12.065, 101.854), (12.9630256121, 101.4820256121), (13.335, 100.584))
            Line((13.335, 100.584), (13.335, 96.774))
            ThreePointArc((13.335, 96.774), (12.9630256121, 95.8759743879), (12.065, 95.504))
        make_face(mode=Mode.SUBTRACT)
        with BuildLine():
            Line((12.065, 120.269), (-12.065, 120.269))
            ThreePointArc((-12.065, 120.269), (-12.9630256121, 120.6409743879), (-13.335, 121.539))
            Line((-13.335, 121.539), (-13.335, 125.349))
            ThreePointArc((-13.335, 125.349), (-12.9630256121, 126.2470256121), (-12.065, 126.619))
            Line((-12.065, 126.619), (12.065, 126.619))
            ThreePointArc((12.065, 126.619), (12.9630256121, 126.2470256121), (13.335, 125.349))
            Line((13.335, 125.349), (13.335, 121.539))
            ThreePointArc((13.335, 121.539), (12.9630256121, 120.6409743879), (12.065, 120.269))
        make_face(mode=Mode.SUBTRACT)
        with Locations((0, 134.9375)):
            Circle(F5_R, mode=Mode.SUBTRACT)
    extrude(amount=F6_DEPTH)

    # F7: fillet of radius 3.175 on 8 edges, made by hand

    # F7_s2 → F7_t1 (cut)
    with BuildSketch(Plane.XY.offset(3.175)):
        with BuildLine():
            ThreePointArc((18.161, 0), (17.2310640303, -2.2450640303), (14.986, -3.175))
            Line((14.986, -3.175), (18.161, -3.175))
            Line((18.161, -3.175), (18.161, 0))
        make_face()
        with BuildLine():
            ThreePointArc((-18.161, 0), (-17.2310640303, -2.2450640303), (-14.986, -3.175))
            Line((-14.986, -3.175), (-18.161, -3.175))
            Line((-18.161, -3.175), (-18.161, 0))
        make_face()
    extrude(amount=F7_T1_DEPTH, mode=Mode.SUBTRACT)

    # F7_s4 → F7_t3 (cut)
    with BuildSketch(Plane.YZ.offset(-14.986)):
        with BuildLine():
            ThreePointArc((0, 0), (-2.2450640303, 0.9299359697), (-3.175, 3.175))
            Line((-3.175, 3.175), (-3.175, 0))
            Line((-3.175, 0), (0, 0))
        make_face()
        with BuildLine():
            ThreePointArc((0, 139.7), (-2.2450640303, 138.7700640303), (-3.175, 136.525))
            Line((-3.175, 136.525), (-3.175, 139.7))
            Line((-3.175, 139.7), (0, 139.7))
        make_face()
    extrude(amount=F7_T3_DEPTH, mode=Mode.SUBTRACT)

    # F7_s5 → F7_t6 (revolve, cut)
    with BuildSketch(Plane.XY.offset(3.175)):
        with BuildLine():
            ThreePointArc((-18.161, 0), (-17.2310640303, -2.2450640303), (-14.986, -3.175))
            Line((-14.986, -3.175), (-18.161, -3.175))
            Line((-18.161, -3.175), (-18.161, 0))
        make_face()
    revolve(axis=Axis((-14.986, -3.175, 3.175), (0, -1, 0)), revolution_arc=F7_T6_ANGLE, mode=Mode.SUBTRACT)

    # F7_s7 → F7_t8 (revolve, cut)
    with BuildSketch(Plane.YZ.offset(14.986)):
        with BuildLine():
            ThreePointArc((0, 0), (-2.2450640303, 0.9299359697), (-3.175, 3.175))
            Line((-3.175, 3.175), (-3.175, 0))
            Line((-3.175, 0), (0, 0))
        make_face()
    revolve(axis=Axis((14.986, -3.175, 3.175), (0, -1, 0)), revolution_arc=F7_T8_ANGLE, mode=Mode.SUBTRACT)

    # F7_s9 → F7_t10 (revolve, cut)
    with BuildSketch(Plane.XY.offset(136.525)):
        with BuildLine():
            ThreePointArc((18.161, 0), (17.2310640303, -2.2450640303), (14.986, -3.175))
            Line((14.986, -3.175), (18.161, -3.175))
            Line((18.161, -3.175), (18.161, 0))
        make_face()
    revolve(axis=Axis((14.986, -3.175, 136.525), (0, -1, 0)), revolution_arc=F7_T10_ANGLE, mode=Mode.SUBTRACT)

    # F7_s11 → F7_t12 (revolve, cut)
    with BuildSketch(Plane.YZ.offset(-14.986)):
        with BuildLine():
            ThreePointArc((0, 139.7), (-2.2450640303, 138.7700640303), (-3.175, 136.525))
            Line((-3.175, 136.525), (-3.175, 139.7))
            Line((-3.175, 139.7), (0, 139.7))
        make_face()
    revolve(axis=Axis((-14.986, -3.175, 136.525), (0, -1, 0)), revolution_arc=F7_T12_ANGLE, mode=Mode.SUBTRACT)


solid = Compound([f1_4.part, f6.part])
